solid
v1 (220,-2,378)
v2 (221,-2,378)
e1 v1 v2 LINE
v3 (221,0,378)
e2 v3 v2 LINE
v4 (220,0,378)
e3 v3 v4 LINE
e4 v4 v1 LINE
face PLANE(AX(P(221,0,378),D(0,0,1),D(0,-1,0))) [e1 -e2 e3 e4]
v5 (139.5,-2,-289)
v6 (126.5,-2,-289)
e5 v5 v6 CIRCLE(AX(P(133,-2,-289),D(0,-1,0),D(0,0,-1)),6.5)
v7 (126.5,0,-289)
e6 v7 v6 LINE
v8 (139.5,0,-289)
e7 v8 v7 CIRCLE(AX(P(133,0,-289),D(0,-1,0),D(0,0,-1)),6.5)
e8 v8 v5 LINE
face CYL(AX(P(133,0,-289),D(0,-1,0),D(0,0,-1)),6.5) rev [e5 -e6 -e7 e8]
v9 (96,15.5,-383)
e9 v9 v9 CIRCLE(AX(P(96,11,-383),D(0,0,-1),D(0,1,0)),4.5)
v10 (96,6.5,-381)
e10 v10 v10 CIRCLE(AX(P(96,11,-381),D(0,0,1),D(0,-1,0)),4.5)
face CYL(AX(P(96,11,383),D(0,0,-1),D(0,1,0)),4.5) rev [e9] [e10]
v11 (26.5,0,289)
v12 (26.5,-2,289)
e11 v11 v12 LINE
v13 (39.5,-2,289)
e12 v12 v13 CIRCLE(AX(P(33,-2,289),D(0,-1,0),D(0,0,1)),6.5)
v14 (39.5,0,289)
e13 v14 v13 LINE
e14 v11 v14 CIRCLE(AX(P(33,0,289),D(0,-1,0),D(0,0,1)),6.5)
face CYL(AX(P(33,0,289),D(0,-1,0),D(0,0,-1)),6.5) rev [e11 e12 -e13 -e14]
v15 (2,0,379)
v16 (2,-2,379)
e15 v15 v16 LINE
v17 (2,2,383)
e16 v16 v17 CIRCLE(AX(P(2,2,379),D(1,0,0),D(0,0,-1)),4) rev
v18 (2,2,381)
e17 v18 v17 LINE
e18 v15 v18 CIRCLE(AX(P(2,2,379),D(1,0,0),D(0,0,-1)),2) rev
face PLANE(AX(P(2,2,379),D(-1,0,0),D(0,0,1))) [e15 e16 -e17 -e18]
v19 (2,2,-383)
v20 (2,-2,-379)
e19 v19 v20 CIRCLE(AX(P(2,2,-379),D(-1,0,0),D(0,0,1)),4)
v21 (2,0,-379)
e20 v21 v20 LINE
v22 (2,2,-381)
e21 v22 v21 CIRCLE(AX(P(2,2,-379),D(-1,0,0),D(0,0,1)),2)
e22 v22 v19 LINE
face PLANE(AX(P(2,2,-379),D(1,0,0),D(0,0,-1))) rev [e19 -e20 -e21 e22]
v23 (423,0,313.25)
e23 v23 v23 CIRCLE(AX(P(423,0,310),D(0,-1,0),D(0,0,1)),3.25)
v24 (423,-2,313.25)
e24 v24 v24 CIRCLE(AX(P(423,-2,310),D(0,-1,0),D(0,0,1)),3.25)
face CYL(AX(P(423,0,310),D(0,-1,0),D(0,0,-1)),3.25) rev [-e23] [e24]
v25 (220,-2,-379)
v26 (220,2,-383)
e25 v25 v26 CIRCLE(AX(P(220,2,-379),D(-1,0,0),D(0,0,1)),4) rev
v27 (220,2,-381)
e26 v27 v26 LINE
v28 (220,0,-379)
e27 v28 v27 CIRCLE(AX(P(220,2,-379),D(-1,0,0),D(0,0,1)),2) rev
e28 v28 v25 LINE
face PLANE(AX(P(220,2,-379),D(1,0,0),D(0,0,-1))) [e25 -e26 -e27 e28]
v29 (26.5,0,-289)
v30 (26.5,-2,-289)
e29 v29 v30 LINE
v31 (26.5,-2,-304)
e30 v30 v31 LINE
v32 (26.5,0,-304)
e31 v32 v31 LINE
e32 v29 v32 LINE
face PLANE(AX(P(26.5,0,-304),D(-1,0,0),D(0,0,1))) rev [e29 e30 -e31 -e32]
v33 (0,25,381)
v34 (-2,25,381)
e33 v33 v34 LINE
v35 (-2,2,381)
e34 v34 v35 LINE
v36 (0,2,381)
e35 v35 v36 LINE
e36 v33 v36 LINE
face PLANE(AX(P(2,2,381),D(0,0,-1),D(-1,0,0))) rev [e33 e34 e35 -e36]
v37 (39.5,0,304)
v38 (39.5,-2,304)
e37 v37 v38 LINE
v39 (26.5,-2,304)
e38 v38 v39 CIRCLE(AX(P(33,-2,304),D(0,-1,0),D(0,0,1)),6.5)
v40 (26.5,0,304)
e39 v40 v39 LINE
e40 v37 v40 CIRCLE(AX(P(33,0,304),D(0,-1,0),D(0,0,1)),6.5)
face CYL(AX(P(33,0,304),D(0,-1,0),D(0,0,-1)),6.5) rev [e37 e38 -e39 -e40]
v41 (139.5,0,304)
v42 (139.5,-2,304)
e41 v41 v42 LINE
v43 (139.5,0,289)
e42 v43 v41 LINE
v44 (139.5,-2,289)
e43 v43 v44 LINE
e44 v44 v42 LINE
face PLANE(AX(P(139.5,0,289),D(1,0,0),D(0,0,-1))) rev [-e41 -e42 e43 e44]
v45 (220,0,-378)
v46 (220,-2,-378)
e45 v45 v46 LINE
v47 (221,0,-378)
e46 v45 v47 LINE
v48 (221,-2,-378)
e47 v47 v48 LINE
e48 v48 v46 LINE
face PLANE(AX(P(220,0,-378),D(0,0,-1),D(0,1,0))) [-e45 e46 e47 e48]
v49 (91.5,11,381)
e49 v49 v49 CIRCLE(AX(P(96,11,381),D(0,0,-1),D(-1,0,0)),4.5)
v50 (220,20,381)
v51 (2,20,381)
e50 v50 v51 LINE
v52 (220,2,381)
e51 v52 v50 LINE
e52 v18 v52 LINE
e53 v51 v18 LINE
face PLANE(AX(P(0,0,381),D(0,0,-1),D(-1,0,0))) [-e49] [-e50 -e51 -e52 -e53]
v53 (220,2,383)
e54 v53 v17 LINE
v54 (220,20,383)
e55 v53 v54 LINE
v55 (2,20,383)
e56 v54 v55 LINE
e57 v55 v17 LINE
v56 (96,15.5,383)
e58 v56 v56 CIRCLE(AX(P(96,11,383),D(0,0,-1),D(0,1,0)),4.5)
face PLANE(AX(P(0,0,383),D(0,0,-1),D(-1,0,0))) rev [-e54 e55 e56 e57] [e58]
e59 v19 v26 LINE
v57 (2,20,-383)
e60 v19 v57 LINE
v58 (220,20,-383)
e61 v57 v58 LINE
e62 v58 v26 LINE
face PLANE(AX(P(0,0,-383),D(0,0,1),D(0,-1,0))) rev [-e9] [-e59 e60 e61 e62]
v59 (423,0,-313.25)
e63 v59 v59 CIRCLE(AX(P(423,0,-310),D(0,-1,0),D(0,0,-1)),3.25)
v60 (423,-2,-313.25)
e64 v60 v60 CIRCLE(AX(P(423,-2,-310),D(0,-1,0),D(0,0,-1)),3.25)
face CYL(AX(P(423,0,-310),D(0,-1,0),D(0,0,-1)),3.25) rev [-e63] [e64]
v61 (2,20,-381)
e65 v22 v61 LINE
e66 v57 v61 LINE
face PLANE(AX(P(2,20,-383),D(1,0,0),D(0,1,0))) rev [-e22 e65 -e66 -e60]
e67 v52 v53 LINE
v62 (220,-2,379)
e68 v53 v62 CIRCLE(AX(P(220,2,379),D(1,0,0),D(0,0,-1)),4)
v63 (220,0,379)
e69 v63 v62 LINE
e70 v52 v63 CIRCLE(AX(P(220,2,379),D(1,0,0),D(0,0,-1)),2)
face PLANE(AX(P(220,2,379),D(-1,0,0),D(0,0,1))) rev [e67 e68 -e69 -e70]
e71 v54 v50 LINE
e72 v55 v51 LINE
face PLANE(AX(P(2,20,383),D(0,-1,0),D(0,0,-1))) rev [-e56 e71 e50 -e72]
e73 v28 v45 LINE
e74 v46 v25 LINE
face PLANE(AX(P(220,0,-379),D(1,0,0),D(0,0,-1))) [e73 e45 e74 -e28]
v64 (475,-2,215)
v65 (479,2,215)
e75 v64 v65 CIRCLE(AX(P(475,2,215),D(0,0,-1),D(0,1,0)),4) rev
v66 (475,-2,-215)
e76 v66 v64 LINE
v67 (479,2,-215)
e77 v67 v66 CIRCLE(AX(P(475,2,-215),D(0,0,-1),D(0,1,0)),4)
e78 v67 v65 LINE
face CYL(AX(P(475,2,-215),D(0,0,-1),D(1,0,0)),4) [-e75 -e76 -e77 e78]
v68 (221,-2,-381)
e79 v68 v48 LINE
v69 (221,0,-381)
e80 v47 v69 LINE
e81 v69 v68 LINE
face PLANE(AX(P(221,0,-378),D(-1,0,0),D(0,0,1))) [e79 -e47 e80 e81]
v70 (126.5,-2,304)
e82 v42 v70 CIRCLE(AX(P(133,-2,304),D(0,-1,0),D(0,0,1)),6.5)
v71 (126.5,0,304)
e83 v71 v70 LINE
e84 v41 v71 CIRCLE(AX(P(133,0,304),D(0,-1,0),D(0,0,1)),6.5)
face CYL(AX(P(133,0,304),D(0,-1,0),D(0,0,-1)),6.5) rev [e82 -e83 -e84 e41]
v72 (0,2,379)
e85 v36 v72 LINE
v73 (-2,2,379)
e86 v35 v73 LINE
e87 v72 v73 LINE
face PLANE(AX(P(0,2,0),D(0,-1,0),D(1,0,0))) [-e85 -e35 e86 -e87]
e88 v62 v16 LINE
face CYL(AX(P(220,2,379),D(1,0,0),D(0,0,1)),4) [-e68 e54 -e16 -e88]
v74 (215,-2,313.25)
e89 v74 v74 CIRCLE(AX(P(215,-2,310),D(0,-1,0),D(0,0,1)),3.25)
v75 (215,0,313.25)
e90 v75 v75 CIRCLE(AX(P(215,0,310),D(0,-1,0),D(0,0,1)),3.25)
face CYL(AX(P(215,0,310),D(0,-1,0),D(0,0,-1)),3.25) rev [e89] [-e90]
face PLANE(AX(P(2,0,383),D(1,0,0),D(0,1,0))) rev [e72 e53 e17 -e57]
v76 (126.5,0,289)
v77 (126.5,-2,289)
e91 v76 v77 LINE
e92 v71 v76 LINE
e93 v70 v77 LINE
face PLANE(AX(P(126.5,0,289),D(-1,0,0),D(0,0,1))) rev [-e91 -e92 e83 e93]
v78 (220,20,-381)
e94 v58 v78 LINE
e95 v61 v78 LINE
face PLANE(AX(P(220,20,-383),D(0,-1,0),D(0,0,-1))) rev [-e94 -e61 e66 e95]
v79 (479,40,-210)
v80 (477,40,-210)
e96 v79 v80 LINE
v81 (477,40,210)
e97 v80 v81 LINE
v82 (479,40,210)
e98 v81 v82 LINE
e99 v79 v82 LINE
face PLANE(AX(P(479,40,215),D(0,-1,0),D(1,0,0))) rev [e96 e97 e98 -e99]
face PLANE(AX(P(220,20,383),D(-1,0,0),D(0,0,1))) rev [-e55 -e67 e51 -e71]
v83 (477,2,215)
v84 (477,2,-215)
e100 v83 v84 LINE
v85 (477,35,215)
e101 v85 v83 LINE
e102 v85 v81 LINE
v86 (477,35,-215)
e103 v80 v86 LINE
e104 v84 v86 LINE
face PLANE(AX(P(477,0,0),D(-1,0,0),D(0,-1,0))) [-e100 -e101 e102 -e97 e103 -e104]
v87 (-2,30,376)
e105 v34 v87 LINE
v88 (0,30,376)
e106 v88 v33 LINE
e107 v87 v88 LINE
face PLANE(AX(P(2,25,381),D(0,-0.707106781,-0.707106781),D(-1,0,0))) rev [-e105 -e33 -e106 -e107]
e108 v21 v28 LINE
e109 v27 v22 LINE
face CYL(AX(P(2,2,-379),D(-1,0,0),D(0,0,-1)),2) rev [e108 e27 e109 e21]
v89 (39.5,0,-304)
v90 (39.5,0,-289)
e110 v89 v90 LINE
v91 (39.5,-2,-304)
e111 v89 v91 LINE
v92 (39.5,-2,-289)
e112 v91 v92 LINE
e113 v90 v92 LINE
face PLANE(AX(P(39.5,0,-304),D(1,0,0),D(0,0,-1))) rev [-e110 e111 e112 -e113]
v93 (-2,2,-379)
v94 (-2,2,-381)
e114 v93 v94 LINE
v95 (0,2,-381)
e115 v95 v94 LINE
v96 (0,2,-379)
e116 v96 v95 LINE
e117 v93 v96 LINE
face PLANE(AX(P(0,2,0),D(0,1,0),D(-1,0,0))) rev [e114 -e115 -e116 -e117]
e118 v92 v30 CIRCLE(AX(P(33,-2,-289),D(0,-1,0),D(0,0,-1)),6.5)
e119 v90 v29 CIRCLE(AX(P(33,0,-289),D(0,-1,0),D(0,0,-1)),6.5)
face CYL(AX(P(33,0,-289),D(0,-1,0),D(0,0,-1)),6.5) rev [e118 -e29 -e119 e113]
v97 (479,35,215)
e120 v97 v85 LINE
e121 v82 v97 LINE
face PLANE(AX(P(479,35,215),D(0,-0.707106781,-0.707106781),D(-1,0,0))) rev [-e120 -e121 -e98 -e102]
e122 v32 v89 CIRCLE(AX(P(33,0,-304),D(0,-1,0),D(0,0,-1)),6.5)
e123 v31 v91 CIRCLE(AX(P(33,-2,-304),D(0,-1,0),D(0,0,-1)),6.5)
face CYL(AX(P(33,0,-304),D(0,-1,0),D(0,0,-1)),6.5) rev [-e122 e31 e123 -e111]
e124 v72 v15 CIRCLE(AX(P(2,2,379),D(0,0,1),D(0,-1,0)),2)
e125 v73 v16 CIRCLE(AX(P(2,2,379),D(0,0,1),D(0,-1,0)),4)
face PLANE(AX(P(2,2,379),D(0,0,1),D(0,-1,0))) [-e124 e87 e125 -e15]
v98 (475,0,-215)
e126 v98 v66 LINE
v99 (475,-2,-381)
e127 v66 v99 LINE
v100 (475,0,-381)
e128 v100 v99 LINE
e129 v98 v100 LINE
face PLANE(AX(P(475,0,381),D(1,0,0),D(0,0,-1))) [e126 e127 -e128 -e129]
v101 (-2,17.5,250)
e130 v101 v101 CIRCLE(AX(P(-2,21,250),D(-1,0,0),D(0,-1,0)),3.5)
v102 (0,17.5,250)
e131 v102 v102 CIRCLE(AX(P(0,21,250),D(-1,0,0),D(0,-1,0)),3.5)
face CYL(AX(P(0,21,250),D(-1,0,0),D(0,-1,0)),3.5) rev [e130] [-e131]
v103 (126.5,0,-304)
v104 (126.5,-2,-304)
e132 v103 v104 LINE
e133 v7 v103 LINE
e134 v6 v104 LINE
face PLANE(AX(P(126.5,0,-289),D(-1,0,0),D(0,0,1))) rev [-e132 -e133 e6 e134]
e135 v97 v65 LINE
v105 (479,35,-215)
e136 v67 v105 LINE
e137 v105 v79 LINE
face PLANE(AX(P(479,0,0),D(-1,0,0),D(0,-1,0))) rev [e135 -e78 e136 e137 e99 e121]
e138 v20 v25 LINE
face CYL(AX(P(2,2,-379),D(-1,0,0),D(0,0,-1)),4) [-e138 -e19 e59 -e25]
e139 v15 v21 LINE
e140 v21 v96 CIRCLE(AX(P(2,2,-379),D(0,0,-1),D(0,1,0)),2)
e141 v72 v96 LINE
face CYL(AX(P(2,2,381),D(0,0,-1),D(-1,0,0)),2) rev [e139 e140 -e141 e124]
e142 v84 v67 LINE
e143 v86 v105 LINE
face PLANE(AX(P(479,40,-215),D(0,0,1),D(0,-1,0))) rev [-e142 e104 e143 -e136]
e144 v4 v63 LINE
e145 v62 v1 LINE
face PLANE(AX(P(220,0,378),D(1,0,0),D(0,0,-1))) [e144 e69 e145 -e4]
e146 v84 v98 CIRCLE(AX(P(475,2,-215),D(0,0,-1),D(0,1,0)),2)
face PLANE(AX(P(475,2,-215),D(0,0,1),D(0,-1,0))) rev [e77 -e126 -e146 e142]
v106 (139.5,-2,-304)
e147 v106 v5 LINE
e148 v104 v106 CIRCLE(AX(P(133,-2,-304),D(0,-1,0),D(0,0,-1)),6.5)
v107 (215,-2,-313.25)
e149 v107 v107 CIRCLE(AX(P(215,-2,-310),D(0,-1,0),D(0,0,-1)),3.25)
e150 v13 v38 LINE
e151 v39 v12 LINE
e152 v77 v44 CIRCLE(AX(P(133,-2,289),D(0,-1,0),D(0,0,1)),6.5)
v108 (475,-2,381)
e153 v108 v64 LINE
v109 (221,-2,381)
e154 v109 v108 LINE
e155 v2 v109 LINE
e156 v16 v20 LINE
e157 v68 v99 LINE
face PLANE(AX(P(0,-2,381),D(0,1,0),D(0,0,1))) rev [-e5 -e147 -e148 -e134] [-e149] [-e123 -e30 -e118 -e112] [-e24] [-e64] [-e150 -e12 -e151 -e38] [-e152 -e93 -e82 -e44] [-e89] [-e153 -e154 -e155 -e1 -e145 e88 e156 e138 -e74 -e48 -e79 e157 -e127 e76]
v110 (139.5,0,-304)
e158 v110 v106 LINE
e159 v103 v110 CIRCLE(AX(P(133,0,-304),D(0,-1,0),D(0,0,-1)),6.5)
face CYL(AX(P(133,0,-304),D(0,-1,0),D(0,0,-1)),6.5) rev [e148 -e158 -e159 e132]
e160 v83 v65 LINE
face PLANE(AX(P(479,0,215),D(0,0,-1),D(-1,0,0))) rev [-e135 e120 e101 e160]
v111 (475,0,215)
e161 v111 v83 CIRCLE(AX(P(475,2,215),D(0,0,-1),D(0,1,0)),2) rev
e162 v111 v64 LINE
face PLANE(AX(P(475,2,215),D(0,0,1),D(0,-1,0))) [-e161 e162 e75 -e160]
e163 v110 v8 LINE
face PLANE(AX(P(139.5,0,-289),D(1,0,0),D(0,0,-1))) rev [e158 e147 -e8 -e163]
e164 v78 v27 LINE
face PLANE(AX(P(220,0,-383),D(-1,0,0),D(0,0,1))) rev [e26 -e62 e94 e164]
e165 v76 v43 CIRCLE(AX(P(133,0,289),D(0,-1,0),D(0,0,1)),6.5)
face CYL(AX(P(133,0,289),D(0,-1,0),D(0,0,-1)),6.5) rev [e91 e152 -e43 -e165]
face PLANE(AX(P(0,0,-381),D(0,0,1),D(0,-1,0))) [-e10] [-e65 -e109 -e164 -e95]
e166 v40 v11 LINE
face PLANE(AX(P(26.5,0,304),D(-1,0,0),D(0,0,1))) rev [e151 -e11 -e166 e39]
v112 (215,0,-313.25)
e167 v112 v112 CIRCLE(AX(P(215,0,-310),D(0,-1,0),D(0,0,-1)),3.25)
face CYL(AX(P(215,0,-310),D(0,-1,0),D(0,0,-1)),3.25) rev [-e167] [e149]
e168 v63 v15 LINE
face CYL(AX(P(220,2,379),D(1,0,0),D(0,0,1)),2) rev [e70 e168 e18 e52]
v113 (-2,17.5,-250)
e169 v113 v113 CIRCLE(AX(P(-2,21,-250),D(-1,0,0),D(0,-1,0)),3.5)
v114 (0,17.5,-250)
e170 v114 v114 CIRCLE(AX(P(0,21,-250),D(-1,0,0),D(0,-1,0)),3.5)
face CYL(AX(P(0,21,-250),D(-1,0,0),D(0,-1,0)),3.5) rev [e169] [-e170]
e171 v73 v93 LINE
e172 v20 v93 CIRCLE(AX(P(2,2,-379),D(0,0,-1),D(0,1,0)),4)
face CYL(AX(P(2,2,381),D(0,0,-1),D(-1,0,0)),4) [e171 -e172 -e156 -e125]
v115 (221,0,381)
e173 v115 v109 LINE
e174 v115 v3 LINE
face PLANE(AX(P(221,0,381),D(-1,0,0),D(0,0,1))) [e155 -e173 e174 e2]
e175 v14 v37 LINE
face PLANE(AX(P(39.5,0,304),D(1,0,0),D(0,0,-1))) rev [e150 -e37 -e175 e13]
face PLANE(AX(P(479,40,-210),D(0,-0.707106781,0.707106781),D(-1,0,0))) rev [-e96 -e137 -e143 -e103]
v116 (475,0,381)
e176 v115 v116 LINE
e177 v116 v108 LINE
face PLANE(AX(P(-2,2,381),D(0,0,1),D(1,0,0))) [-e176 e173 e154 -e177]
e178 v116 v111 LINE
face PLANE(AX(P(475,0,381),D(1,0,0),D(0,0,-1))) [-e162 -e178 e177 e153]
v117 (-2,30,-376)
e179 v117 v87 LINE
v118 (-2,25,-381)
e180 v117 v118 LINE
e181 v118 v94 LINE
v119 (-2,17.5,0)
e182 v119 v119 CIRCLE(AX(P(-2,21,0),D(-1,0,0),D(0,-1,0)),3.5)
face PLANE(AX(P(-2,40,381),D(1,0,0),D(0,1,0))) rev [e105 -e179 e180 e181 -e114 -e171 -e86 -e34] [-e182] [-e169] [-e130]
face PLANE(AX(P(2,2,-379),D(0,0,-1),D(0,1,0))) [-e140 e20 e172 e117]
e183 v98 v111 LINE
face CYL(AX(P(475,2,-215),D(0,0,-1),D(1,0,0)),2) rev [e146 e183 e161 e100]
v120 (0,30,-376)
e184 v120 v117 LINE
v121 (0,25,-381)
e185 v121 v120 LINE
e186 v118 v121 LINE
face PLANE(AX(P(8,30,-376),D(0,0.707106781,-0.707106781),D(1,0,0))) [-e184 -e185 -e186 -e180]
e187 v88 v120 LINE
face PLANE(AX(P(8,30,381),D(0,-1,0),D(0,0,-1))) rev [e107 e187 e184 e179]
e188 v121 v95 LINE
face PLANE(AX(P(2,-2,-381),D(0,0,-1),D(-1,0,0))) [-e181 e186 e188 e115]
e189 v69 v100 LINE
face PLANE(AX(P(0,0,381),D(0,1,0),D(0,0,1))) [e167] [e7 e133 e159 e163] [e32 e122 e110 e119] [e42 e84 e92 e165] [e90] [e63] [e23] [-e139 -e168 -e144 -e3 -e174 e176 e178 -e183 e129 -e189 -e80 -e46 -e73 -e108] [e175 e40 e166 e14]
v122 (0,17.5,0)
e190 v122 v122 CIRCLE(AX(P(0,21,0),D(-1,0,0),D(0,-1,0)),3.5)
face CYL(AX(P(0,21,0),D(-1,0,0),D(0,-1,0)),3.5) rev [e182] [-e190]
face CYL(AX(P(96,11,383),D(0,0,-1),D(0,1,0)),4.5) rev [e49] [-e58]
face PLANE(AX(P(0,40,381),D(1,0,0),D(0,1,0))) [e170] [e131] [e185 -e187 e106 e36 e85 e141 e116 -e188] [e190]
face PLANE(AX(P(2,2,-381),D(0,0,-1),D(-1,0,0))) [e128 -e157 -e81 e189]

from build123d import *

# Parameters (mm, degrees)
SM_BASE_FLANGE_1_DEPTH   = 381
SKETCH_6_R               = 3.5
CUT_EXTRUDE_1_DEPTH      = 10
SKETCH_7_R               = 3.25
CUT_EXTRUDE_2_DEPTH      = 10
SM_EDGE_FLANGE_2_DEPTH   = 430
OTHER_START              = -2
OTHER_1_DEPTH            = 2
OTHER_START_2            = 477
OTHER_1_2_DEPTH          = 2
SM_START                 = -2
SM_EDGE_FLANGE_4_DEPTH   = 223
SM_EDGE_FLANGE_4_2_DEPTH = 4
SM_START_2               = 220
SM_EDGE_FLANGE_4_3_DEPTH = 1
SM_START_3               = 2
SM_EDGE_FLANGE_4_4_DEPTH = 218
SKETCH_26_R              = 4.5
CUT_EXTRUDE_3_DEPTH      = 905.321292462
SKETCH_28_W              = 762
SKETCH_28_H              = 10
CUT_EXTRUDE_4_DEPTH      = 10
CHAMFER_1_SIZE           = 5


# Read off the part's stored shape, not the designer's step: Затупленный угол1, Ребро-кромка4
# Sheet-metal steps are written as plain solids
with BuildPart() as part:
    # Sketch 1 → Базовая кромка1 (new, symmetric)
    with BuildSketch(Plane.XY):
        with BuildLine():
            Line((0, 40), (0, 2))
            ThreePointArc((0, 2), (0.585786438, 0.585786438), (2, 0))
            Line((2, 0), (475, 0))
            Line((475, 0), (475, -2))
            Line((475, -2), (2, -2))
            ThreePointArc((2, -2), (-0.828427125, -0.828427125), (-2, 2))
            Line((-2, 2), (-2, 40))
            Line((-2, 40), (0, 40))
        make_face()
    extrude(amount=SM_BASE_FLANGE_1_DEPTH, both=True)

    # Эскиз6 → Вырез-Вытянуть1 (cut)
    with BuildSketch(Plane.ZY.offset(2)):
        with Locations(Location((-250, 21, 0), (0, 0, 270))):
            Circle(SKETCH_6_R)
        with Locations(Location((0, 21, 0), (0, 0, 270))):
            Circle(SKETCH_6_R)
        with Locations(Location((250, 21, 0), (0, 0, 270))):
            Circle(SKETCH_6_R)
    extrude(amount=-CUT_EXTRUDE_1_DEPTH, mode=Mode.SUBTRACT)

    # Эскиз7 → Вырез-Вытянуть2 (cut)
    with BuildSketch(Plane.XZ.offset(2)):
        with Locations(Location((215, -310, 0), (0, 0, 270))):
            Circle(SKETCH_7_R)
        with Locations(Location((215, 310, 0), (0, 0, 90))):
            Circle(SKETCH_7_R)
        with Locations(Location((423, -310, 0), (0, 0, 270))):
            Circle(SKETCH_7_R)
        with Locations(Location((423, 310, 0), (0, 0, 90))):
            Circle(SKETCH_7_R)
        with BuildLine():
            Line((26.5, -304), (26.5, -289))
            ThreePointArc((26.5, -289), (33, -282.5), (39.5, -289))
            Line((39.5, -289), (39.5, -304))
            ThreePointArc((39.5, -304), (33, -310.5), (26.5, -304))
        make_face()
        with BuildLine():
            Line((139.5, -289), (139.5, -304))
            ThreePointArc((139.5, -304), (133, -310.5), (126.5, -304))
            Line((126.5, -304), (126.5, -289))
            ThreePointArc((126.5, -289), (133, -282.5), (139.5, -289))
        make_face()
        with BuildLine():
            Line((26.5, 304), (26.5, 289))
            ThreePointArc((26.5, 289), (33, 282.5), (39.5, 289))
            Line((39.5, 289), (39.5, 304))
            ThreePointArc((39.5, 304), (33, 310.5), (26.5, 304))
        make_face()
        with BuildLine():
            Line((139.5, 289), (139.5, 304))
            ThreePointArc((139.5, 304), (133, 310.5), (126.5, 304))
            Line((126.5, 304), (126.5, 289))
            ThreePointArc((126.5, 289), (133, 282.5), (139.5, 289))
        make_face()
    extrude(amount=-CUT_EXTRUDE_2_DEPTH, mode=Mode.SUBTRACT)

    # Ребро-кромка2 section (across the edge) → Ребро-кромка2 (add)
    with BuildSketch(Plane(origin=(477, 0, 215), x_dir=(-1, 0, 0), z_dir=(0, 0, -1))):
        with BuildLine():
            Line((-2, 2), (-2, 40))
            Line((-2, 40), (0, 40))
            Line((0, 40), (0, 2))
            ThreePointArc((0, 2), (0.585786438, 0.585786438), (2, 0))
            Line((2, 0), (2, -2))
            ThreePointArc((2, -2), (-0.828427125, -0.828427125), (-2, 2))
        make_face()
    extrude(amount=SM_EDGE_FLANGE_2_DEPTH)

    # Other 1 outline → Other 1 (cut)
    with BuildSketch(Plane.YZ.offset(OTHER_START)):
        Polygon((40, -381), (40, -376), (35, -381), align=None)
        Polygon((35, 381), (40, 376), (40, 381), align=None)
    extrude(amount=OTHER_1_DEPTH, mode=Mode.SUBTRACT)

    # Other 1 2 outline → Other 1 2 (cut)
    with BuildSketch(Plane.YZ.offset(OTHER_START_2)):
        Polygon((35, 215), (40, 210), (40, 215), align=None)
        Polygon((35, -215), (40, -215), (40, -210), align=None)
    extrude(amount=OTHER_1_2_DEPTH, mode=Mode.SUBTRACT)

    # Ребро-кромка4 outline → Ребро-кромка4 (cut)
    with BuildSketch(Plane.YZ.offset(SM_START)):
        with BuildLine():
            ThreePointArc((0, -379), (0.585786438, -380.414213562), (2, -381))
            Line((2, -381), (2, -379))
            Line((2, -379), (0, -379))
        make_face()
        with BuildLine():
            ThreePointArc((-1.464101616, -381), (-1.863703305, -380.03527618), (-2, -379))
            Line((-2, -379), (-2, -381))
            Line((-2, -381), (-1.464101616, -381))
        make_face()
        with BuildLine():
            ThreePointArc((2, 381), (0.585786438, 380.414213562), (0, 379))
            Line((0, 379), (2, 379))
            Line((2, 379), (2, 381))
        make_face()
        with BuildLine():
            Line((-2, 381), (-2, 379))
            ThreePointArc((-2, 379), (-1.863703305, 380.03527618), (-1.464101616, 381))
            Line((-1.464101616, 381), (-2, 381))
        make_face()
    extrude(amount=SM_EDGE_FLANGE_4_DEPTH, mode=Mode.SUBTRACT)

    # Sm Edge Flange 4 2 outline → Sm Edge Flange 4 2 (cut)
    with BuildSketch(Plane.YZ.offset(SM_START)):
        with BuildLine():
            ThreePointArc((2, -381), (0.585786438, -380.414213562), (0, -379))
            Line((0, -379), (-2, -379))
            ThreePointArc((-2, -379), (-1.863703305, -380.03527618), (-1.464101616, -381))
            Line((-1.464101616, -381), (2, -381))
        make_face()
        with BuildLine():
            Line((2, 381), (-1.464101616, 381))
            ThreePointArc((-1.464101616, 381), (-1.863703305, 380.03527618), (-2, 379))
            Line((-2, 379), (0, 379))
            ThreePointArc((0, 379), (0.585786438, 380.414213562), (2, 381))
        make_face()
    extrude(amount=SM_EDGE_FLANGE_4_2_DEPTH, mode=Mode.SUBTRACT)

    # Sm Edge Flange 4 3 outline → Sm Edge Flange 4 3 (cut)
    with BuildSketch(Plane.YZ.offset(SM_START_2)):
        with BuildLine():
            Line((0, -381), (0, -378))
            Line((0, -378), (-2, -378))
            Line((-2, -378), (-2, -379))
            ThreePointArc((-2, -379), (-1.863703305, -380.03527618), (-1.464101616, -381))
            Line((-1.464101616, -381), (0, -381))
        make_face()
        with BuildLine():
            Line((-2, 378), (0, 378))
            Line((0, 378), (0, 381))
            Line((0, 381), (-1.464101616, 381))
            ThreePointArc((-1.464101616, 381), (-1.863703305, 380.03527618), (-2, 379))
            Line((-2, 379), (-2, 378))
        make_face()
    extrude(amount=SM_EDGE_FLANGE_4_3_DEPTH, mode=Mode.SUBTRACT)

    # Sm Edge Flange 4 4 outline → Sm Edge Flange 4 4 (add)
    with BuildSketch(Plane.YZ.offset(SM_START_3)):
        with BuildLine():
            Line((0, -379), (0, -381))
            Line((0, -381), (-1.464101616, -381))
            ThreePointArc((-1.464101616, -381), (0, -382.464101615), (2, -383))
            Line((2, -383), (20, -383))
            Line((20, -383), (20, -381))
            Line((20, -381), (2, -381))
            ThreePointArc((2, -381), (0.585786438, -380.414213562), (0, -379))
        make_face()
        with BuildLine():
            Line((0, 381), (0, 379))
            ThreePointArc((0, 379), (0.585786438, 380.414213562), (2, 381))
            Line((2, 381), (20, 381))
            Line((20, 381), (20, 383))
            Line((20, 383), (2, 383))
            ThreePointArc((2, 383), (0, 382.464101615), (-1.464101616, 381))
            Line((-1.464101616, 381), (0, 381))
        make_face()
    extrude(amount=SM_EDGE_FLANGE_4_4_DEPTH)

    # Эскиз26 → Вырез-Вытянуть3 (cut, through all)
    with BuildSketch(Plane(origin=(0, 0, -383), x_dir=(-1, 0, 0), z_dir=(0, 0, -1))):
        with Locations(Location((-96, 11, 0), (0, 0, 90))):
            Circle(SKETCH_26_R)
    extrude(amount=-CUT_EXTRUDE_3_DEPTH, mode=Mode.SUBTRACT)

    # Эскиз28 → Вырез-Вытянуть4 (cut)
    with BuildSketch(Plane.ZY.offset(2)):
        with Locations((0, 35)):
            Rectangle(SKETCH_28_W, SKETCH_28_H)
    extrude(amount=-CUT_EXTRUDE_4_DEPTH, mode=Mode.SUBTRACT)

    # Фаска1
    chamfer_1_edges = [part.edges().sort_by_distance(p)[0] for p in [
        (-1, 30, 381),
        (-1, 30, -381),
    ]]
    chamfer(chamfer_1_edges, length=CHAMFER_1_SIZE)


solid = part.part
